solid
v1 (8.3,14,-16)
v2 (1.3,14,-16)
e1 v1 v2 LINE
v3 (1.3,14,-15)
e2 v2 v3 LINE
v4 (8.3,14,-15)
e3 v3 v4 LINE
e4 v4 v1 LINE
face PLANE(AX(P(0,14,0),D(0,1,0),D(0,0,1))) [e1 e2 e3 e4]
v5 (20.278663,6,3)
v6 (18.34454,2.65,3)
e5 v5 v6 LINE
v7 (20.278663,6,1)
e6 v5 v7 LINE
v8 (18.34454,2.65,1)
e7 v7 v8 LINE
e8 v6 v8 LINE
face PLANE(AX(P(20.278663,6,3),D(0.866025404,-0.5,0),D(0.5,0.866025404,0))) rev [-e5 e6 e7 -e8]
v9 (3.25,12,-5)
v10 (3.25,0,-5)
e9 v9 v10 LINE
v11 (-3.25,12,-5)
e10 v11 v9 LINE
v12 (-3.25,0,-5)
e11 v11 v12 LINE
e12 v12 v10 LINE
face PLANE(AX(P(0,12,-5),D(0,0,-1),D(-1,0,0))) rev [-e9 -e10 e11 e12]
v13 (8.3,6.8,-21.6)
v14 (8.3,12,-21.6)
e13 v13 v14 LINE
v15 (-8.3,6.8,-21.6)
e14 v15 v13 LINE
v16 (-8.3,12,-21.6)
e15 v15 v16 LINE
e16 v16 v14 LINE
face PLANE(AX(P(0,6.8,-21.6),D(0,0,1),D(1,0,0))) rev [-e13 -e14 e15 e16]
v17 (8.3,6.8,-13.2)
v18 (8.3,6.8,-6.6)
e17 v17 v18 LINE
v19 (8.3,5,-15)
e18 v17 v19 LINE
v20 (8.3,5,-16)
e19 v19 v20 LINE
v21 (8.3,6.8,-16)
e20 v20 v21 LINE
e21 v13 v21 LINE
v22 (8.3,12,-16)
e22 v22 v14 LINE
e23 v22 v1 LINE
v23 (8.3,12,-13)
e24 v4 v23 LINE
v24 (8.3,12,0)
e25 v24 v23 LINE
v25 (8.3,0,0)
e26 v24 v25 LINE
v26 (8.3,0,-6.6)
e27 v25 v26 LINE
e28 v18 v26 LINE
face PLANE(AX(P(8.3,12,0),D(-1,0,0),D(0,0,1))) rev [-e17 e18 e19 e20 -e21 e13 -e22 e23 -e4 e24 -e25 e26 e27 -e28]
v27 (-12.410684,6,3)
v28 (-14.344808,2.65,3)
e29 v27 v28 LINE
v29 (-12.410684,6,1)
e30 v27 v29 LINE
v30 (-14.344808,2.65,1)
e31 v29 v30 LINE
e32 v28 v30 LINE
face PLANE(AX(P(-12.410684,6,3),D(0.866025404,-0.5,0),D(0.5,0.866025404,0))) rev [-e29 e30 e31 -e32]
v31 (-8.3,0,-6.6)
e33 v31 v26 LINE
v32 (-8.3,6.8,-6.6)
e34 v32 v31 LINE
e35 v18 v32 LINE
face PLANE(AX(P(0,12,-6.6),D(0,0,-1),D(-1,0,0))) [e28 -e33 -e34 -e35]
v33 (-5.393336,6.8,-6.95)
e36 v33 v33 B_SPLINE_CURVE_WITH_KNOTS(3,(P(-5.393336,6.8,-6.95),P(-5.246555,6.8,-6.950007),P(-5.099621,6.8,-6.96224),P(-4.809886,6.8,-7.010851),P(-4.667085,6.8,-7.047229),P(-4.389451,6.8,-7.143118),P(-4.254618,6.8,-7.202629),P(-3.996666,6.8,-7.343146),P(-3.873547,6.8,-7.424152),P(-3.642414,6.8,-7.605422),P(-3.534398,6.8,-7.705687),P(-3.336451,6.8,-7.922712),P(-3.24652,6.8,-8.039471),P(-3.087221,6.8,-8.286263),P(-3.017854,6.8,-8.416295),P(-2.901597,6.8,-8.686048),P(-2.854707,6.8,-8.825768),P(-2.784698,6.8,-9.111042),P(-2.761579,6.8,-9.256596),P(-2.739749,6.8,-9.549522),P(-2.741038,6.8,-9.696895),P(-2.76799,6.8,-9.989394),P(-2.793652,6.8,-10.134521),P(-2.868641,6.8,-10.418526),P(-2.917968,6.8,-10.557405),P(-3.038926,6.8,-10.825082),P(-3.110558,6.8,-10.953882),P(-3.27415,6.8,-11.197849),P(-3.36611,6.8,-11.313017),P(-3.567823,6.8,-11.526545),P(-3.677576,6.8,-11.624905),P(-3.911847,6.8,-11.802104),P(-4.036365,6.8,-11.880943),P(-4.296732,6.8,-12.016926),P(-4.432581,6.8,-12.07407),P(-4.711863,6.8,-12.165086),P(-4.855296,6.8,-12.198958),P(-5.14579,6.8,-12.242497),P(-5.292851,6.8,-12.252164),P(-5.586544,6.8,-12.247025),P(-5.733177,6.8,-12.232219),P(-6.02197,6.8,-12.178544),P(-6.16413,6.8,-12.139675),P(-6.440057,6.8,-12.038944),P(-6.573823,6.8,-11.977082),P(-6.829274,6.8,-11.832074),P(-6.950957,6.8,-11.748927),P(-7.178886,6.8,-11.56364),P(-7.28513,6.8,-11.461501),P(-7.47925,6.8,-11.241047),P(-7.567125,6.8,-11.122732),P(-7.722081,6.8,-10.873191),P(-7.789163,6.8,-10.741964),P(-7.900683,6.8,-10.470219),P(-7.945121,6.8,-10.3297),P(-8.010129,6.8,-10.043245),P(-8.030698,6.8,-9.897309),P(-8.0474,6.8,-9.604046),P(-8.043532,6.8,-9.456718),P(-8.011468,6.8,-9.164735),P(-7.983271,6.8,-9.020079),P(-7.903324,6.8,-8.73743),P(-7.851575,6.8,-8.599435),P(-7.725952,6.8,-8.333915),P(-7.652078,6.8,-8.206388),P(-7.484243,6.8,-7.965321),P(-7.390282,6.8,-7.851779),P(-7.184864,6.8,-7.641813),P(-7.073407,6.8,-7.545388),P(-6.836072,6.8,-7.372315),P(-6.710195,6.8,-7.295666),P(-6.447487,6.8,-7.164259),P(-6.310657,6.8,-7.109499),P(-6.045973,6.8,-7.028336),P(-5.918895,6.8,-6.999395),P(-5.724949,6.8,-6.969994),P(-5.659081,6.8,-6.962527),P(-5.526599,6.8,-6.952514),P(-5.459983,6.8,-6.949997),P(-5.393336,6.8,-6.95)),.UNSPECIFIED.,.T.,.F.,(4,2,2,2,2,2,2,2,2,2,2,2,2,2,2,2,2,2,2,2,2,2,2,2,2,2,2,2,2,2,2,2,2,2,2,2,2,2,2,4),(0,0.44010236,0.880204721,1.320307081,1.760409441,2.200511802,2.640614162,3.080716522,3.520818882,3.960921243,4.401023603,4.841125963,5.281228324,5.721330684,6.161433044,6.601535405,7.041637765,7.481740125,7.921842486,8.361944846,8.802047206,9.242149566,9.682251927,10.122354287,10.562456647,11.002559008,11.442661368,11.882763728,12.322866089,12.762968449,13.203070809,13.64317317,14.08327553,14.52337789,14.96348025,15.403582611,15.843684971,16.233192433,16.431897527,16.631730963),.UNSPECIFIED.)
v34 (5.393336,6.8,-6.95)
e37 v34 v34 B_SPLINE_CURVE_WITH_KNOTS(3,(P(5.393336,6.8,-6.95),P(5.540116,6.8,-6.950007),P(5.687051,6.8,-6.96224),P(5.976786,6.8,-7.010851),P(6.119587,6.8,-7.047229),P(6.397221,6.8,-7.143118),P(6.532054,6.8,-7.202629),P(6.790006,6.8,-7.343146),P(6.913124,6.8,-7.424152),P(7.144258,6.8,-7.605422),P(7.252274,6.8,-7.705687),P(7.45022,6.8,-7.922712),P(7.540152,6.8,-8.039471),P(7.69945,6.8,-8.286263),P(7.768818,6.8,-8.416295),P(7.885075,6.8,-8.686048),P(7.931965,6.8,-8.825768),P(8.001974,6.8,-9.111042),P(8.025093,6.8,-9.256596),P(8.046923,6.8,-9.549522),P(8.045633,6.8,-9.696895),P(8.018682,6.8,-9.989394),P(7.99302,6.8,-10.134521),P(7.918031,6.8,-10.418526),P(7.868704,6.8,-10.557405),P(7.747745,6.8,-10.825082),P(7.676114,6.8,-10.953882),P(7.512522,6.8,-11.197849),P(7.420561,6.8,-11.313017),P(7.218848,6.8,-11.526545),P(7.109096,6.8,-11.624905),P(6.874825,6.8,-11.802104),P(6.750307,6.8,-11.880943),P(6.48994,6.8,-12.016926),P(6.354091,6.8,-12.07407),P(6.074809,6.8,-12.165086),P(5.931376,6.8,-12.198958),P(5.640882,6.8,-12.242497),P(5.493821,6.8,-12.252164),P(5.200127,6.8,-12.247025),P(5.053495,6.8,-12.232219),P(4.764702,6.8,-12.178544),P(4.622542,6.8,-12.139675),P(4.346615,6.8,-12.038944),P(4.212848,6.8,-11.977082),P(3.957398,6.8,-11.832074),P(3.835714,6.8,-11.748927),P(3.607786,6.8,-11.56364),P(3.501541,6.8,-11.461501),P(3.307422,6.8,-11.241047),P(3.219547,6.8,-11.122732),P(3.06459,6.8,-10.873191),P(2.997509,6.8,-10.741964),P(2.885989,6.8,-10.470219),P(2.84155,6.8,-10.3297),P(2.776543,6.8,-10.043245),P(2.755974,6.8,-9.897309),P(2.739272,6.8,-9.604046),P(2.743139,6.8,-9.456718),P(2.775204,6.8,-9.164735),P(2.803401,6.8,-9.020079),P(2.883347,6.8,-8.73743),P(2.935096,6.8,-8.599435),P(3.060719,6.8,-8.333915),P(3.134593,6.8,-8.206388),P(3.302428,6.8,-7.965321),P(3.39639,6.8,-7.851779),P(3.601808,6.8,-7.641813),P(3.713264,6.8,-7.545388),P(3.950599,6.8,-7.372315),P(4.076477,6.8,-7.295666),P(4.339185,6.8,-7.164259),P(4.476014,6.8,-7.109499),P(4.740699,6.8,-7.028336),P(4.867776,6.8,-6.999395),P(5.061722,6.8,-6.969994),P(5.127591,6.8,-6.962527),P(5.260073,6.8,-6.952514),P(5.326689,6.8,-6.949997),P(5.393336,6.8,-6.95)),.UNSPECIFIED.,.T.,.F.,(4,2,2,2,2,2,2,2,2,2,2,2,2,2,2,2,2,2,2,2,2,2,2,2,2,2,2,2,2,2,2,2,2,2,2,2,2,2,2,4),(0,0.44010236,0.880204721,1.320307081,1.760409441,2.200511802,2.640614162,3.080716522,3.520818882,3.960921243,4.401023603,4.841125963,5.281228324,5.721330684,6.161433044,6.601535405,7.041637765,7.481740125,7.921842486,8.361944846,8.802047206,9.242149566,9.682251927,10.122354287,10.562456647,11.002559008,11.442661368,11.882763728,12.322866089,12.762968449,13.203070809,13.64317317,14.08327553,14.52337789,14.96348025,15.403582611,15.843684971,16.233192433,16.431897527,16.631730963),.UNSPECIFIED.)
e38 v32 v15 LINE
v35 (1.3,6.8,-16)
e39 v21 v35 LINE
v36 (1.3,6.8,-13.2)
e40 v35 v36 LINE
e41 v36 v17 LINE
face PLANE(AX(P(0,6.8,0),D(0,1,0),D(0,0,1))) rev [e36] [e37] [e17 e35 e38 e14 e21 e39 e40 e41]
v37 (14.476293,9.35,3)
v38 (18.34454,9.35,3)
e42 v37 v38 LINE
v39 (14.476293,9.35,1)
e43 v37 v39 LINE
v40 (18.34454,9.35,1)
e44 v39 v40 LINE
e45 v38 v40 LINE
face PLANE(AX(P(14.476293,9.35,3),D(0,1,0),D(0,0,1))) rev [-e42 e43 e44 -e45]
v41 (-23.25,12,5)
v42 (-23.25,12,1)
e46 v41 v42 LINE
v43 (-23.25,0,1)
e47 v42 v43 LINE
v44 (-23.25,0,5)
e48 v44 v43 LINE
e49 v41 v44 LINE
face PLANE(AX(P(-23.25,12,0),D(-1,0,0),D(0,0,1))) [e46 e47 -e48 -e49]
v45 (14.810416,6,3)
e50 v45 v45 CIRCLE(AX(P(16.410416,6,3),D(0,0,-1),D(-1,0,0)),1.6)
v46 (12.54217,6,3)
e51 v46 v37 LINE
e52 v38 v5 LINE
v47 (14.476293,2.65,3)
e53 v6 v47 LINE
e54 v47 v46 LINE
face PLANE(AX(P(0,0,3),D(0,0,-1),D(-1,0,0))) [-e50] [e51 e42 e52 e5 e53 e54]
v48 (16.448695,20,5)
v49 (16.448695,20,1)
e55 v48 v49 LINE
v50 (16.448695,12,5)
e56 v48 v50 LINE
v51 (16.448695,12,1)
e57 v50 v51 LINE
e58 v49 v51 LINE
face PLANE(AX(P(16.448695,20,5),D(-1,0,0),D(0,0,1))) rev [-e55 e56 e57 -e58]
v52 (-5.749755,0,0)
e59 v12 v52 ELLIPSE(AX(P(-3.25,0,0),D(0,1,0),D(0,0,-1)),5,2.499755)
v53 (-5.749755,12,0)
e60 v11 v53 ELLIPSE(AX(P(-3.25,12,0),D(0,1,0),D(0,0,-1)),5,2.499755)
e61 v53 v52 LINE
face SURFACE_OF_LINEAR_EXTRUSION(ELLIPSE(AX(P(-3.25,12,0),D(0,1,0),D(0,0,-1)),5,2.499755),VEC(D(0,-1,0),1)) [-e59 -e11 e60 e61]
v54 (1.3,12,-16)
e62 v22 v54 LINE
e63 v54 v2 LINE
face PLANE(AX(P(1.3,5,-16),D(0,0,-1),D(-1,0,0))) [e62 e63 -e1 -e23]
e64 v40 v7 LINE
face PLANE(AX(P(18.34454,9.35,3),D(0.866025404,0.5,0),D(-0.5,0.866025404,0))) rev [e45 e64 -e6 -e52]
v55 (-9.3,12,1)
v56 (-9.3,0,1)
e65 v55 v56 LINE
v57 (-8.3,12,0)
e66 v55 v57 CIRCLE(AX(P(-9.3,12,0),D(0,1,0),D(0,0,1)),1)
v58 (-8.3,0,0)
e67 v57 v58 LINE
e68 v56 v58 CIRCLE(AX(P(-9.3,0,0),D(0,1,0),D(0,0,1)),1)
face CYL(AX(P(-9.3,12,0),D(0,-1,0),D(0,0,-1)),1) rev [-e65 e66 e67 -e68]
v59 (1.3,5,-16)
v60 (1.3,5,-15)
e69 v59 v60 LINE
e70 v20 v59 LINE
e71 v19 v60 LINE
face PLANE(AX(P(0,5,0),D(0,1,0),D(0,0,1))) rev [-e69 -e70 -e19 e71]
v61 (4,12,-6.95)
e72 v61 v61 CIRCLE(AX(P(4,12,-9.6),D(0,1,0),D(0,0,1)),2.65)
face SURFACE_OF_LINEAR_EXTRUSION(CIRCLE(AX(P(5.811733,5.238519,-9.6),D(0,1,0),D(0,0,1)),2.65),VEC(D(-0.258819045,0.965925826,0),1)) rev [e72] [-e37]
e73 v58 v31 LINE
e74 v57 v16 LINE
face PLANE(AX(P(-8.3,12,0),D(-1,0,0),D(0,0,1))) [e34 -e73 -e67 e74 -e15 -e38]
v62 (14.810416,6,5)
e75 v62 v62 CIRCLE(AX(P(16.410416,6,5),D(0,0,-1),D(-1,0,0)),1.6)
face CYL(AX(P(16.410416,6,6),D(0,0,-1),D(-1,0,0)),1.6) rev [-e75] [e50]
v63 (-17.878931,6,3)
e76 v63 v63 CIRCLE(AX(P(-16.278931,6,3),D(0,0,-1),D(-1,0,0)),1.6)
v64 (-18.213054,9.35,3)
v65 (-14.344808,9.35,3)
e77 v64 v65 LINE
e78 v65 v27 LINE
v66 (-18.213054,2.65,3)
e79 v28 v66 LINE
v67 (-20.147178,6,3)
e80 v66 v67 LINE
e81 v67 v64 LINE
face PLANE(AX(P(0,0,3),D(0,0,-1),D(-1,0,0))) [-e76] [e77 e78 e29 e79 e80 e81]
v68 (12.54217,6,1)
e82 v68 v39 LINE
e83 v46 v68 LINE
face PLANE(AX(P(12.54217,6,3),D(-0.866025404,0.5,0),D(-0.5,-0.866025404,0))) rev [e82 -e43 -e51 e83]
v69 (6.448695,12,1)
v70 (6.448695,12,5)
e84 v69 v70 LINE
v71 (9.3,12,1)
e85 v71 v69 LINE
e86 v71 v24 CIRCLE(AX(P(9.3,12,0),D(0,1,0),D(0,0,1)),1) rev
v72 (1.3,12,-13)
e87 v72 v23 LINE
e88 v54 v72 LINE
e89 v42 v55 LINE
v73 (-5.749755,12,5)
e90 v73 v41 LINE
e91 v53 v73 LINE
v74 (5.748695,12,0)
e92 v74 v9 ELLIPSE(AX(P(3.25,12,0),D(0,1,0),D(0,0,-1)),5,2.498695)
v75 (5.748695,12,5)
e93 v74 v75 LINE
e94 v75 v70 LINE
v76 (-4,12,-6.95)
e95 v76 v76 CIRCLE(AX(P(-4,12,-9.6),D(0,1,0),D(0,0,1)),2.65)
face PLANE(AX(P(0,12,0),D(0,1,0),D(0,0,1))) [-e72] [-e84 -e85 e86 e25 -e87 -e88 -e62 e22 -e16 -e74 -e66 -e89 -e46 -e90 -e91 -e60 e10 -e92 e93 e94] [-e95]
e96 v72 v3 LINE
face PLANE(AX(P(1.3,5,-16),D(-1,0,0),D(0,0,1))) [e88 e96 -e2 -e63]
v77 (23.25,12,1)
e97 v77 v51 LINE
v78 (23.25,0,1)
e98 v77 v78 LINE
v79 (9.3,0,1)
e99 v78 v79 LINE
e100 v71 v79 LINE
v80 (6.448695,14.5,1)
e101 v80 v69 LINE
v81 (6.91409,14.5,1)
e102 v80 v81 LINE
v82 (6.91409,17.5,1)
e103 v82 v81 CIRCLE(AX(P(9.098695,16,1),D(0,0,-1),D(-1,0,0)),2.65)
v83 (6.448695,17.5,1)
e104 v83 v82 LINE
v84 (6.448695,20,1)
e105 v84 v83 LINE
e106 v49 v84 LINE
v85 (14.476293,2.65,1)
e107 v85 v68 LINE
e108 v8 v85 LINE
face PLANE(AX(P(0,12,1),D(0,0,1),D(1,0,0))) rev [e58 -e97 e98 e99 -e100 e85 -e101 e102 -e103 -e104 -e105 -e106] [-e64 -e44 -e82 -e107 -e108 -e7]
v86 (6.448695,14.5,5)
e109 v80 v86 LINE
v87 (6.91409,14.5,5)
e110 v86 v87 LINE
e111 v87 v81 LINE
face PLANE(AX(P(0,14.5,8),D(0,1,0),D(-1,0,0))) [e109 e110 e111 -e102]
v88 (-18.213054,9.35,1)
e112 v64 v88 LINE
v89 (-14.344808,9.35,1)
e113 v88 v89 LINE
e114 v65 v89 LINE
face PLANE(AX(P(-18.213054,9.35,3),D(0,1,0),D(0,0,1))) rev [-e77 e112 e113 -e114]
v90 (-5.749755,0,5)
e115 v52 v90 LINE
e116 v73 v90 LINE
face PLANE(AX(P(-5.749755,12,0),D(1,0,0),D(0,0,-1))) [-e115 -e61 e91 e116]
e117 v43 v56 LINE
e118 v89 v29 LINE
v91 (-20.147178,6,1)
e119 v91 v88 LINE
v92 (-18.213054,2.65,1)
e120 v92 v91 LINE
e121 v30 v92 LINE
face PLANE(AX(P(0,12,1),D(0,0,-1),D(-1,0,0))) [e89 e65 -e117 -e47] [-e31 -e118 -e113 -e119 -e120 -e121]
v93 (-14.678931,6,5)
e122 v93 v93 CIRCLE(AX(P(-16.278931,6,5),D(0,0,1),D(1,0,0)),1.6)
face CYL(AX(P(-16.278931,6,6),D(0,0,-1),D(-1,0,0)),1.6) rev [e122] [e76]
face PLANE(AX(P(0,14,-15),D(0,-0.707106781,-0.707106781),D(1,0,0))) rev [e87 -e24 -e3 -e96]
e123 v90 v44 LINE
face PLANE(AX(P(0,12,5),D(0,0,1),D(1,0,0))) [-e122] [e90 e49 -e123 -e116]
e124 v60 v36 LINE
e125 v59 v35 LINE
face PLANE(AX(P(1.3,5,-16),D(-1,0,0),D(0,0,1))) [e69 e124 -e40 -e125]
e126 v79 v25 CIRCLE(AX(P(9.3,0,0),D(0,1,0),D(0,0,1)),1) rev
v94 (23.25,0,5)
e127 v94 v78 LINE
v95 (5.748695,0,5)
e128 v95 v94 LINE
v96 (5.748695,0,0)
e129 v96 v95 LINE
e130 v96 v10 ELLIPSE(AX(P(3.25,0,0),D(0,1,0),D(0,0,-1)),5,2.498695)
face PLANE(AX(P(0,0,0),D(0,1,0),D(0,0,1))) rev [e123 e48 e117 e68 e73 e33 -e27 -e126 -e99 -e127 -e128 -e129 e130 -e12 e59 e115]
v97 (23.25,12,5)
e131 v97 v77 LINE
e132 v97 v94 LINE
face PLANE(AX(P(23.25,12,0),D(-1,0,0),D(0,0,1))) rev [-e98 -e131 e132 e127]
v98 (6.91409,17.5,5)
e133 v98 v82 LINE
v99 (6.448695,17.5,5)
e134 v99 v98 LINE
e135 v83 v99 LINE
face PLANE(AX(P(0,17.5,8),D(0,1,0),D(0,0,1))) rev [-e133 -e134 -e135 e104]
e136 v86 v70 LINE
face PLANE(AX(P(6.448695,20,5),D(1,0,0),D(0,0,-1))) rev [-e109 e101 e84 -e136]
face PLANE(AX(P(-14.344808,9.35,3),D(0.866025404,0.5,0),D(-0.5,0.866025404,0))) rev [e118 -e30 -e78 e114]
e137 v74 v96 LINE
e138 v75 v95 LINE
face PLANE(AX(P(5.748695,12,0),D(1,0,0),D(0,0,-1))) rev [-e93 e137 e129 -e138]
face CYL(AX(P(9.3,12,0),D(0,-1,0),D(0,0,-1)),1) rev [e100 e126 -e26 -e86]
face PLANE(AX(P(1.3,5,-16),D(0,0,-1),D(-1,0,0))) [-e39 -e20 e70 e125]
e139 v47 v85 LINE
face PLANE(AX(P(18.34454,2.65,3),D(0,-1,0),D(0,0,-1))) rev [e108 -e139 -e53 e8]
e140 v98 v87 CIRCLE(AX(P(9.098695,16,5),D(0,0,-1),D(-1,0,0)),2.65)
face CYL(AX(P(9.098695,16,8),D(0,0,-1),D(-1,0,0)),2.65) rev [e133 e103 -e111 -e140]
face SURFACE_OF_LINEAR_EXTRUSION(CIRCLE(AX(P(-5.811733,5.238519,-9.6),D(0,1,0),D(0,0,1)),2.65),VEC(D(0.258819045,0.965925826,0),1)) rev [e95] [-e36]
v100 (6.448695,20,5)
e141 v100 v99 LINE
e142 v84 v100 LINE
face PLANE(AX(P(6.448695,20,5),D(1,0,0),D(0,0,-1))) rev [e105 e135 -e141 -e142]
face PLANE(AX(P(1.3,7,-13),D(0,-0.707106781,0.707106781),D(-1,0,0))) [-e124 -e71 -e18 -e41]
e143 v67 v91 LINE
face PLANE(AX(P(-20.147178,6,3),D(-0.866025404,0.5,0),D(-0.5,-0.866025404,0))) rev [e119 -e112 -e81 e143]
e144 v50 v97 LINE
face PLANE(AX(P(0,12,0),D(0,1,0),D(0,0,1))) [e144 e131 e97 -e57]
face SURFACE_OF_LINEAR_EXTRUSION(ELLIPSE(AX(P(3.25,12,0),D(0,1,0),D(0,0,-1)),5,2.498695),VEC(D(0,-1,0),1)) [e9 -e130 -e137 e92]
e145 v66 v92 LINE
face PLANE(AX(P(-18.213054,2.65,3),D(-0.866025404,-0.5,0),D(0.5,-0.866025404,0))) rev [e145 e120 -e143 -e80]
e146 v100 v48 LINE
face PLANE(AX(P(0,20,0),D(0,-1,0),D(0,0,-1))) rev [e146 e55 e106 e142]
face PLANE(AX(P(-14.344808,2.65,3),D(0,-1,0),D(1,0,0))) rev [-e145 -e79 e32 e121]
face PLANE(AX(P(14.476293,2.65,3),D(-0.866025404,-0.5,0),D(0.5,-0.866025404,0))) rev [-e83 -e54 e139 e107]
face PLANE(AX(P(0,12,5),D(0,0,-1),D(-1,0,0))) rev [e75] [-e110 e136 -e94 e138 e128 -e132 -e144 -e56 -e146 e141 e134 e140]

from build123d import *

# Parameters (mm, degrees)
BOSS_EXTRUDE1_DEPTH      = 12
CUT_EXTRUDE1_DEPTH       = 2
SKETCH3_W                = 16.6
SKETCH3_H                = 15
BOSS_EXTRUDE2_DEPTH      = 5.2
SKETCH5_R                = 1.6
CUT_EXTRUDE2_DEPTH       = 5
SKETCH6_W                = 10
SKETCH6_H                = 4
BOSS_EXTRUDE4_DEPTH      = 8
CUT_EXTRUDE4_DEPTH       = 7
SKETCH8_R                = 2.65
CUT_EXTRUDE5_DEPTH       = 7
SKETCH10_R               = 2.65
CUT_EXTRUDE6_DEPTH       = 7
BOSS_EXTRUDE6_DEPTH      = 2
BOSS_EXTRUDE6_DEPTH_BACK = 7
SKETCH11_W               = 7
SKETCH11_H               = 3
CHAMFER2_SIZE            = 2


with BuildPart() as part:
    # Sketch1 → Boss-Extrude1 (new body)
    with BuildSketch(Plane(origin=(0, 0, 0), x_dir=(1, 0, 0), z_dir=(0, 1, 0))):
        with BuildLine():
            Line((-23.25, -5), (-5.749755012, -5))
            Line((-5.749755012, -5), (-5.749755012, 0))
            add(Edge.make_bspline(
                [(-3.25, 5), (-5.749755012, 5), (-5.749755012, 0)],
                knots=[0, 0, 0, 1.570796327, 1.570796327, 1.570796327], degree=2, weights=[1, 0.707106781, 1]))
            Line((-3.25, 5), (3.25, 5))
            add(Edge.make_bspline(
                [(5.748694825, 0), (5.748694825, 5), (3.25, 5)],
                knots=[4.71238898, 4.71238898, 4.71238898, 6.283185307, 6.283185307, 6.283185307], degree=2, weights=[1, 0.707106781, 1]))
            Line((5.748694825, 0), (5.748694825, -5))
            Line((5.748694825, -5), (23.25, -5))
            Line((23.25, -5), (23.25, -3))
            Line((23.25, -3), (23.25, -1))
            Line((23.25, -1), (9.3, -1))
            ThreePointArc((9.3, -1), (8.592893219, -0.707106781), (8.3, 0))
            Line((8.3, 0), (8.3, 6.6))
            Line((8.3, 6.6), (-8.3, 6.6))
            Line((-8.3, 6.6), (-8.3, 0))
            ThreePointArc((-8.3, 0), (-8.592893219, -0.707106781), (-9.3, -1))
            Line((-9.3, -1), (-23.25, -1))
            Line((-23.25, -1), (-23.25, -5))
        make_face()
    extrude(amount=BOSS_EXTRUDE1_DEPTH)

    # Sketch2 → Cut-Extrude1 (cut)
    with BuildSketch(Plane(origin=(0, 0, 1), x_dir=(-1, 0, 0), z_dir=(0, 0, -1))):
        Polygon((20.147177825, 6), (18.213054423, 9.35), (14.344807619, 9.35), (12.410684218, 6), (14.344807619, 2.65), (18.213054423, 2.65), align=None)
        Polygon((-12.542169585, 6), (-14.476292987, 9.35), (-18.34453979, 9.35), (-20.278663192, 6), (-18.34453979, 2.65), (-14.476292987, 2.65), align=None)
    extrude(amount=-CUT_EXTRUDE1_DEPTH, mode=Mode.SUBTRACT)

    # Sketch3 → Boss-Extrude2 (add)
    with BuildSketch(Plane(origin=(0, 12, 0), x_dir=(1, 0, 0), z_dir=(0, 1, 0))):
        with Locations((0, 14.1)):
            Rectangle(SKETCH3_W, SKETCH3_H)
    extrude(amount=-BOSS_EXTRUDE2_DEPTH)

    # Sketch5 → Cut-Extrude2 (cut)
    with BuildSketch(Plane(origin=(0, 0, 1), x_dir=(-1, 0, 0), z_dir=(0, 0, -1))):
        with Locations((-16.410416388, 6)):
            Circle(SKETCH5_R)
        with Locations((16.278931021, 6)):
            Circle(SKETCH5_R)
    extrude(amount=-CUT_EXTRUDE2_DEPTH, mode=Mode.SUBTRACT)

    # Sketch6 → Boss-Extrude4 (add)
    with BuildSketch(Plane(origin=(0, 12, 0), x_dir=(1, 0, 0), z_dir=(0, 1, 0))):
        with Locations((11.448694825, -3)):
            Rectangle(SKETCH6_W, SKETCH6_H)
    extrude(amount=BOSS_EXTRUDE4_DEPTH)

    # Sketch7 → Cut-Extrude4 (cut)
    with BuildSketch(Plane(origin=(0, 0, 1), x_dir=(-1, 0, 0), z_dir=(0, 0, -1))):
        with BuildLine():
            ThreePointArc((-6.448694825, 16), (-6.567716372, 16.785269427), (-6.914089597, 17.5))
            Line((-6.914089597, 17.5), (-7.999397269, 17.5))
            Line((-7.999397269, 17.5), (-7.999397269, 14.5))
            Line((-7.999397269, 14.5), (-6.914089597, 14.5))
            ThreePointArc((-6.914089597, 14.5), (-6.567716372, 15.214730573), (-6.448694825, 16))
        make_face()
        with BuildLine():
            Line((-7.999397269, 17.5), (-6.914089597, 17.5))
            ThreePointArc((-6.914089597, 17.5), (-11.748694825, 16), (-6.914089597, 14.5))
            Line((-6.914089597, 14.5), (-7.999397269, 14.5))
            Line((-7.999397269, 14.5), (-7.999397269, 17.5))
        make_face()
        with BuildLine():
            Line((-6.448694825, 14.5), (-6.448694825, 16))
            ThreePointArc((-6.448694825, 16), (-6.567716372, 15.214730573), (-6.914089597, 14.5))
            Line((-6.914089597, 14.5), (-6.448694825, 14.5))
        make_face()
        with BuildLine():
            Line((-6.448694825, 16), (-6.448694825, 17.5))
            Line((-6.448694825, 17.5), (-6.914089597, 17.5))
            ThreePointArc((-6.914089597, 17.5), (-6.567716372, 16.785269427), (-6.448694825, 16))
        make_face()
    extrude(amount=-CUT_EXTRUDE4_DEPTH, mode=Mode.SUBTRACT)

    # Sketch8 → Cut-Extrude5 (cut, along a direction that is not the sketch's normal)
    with BuildSketch(Plane(origin=(0, 12, 0), x_dir=(1, 0, 0), z_dir=(0, 1, 0))):
        with Locations((-4, 9.6)):
            Circle(SKETCH8_R)
    extrude(amount=-CUT_EXTRUDE5_DEPTH, dir=(0.2588190451025147, 0.96592582628907, -1.457918124587514e-13), mode=Mode.SUBTRACT)

    # Sketch10 → Cut-Extrude6 (cut, along a direction that is not the sketch's normal)
    with BuildSketch(Plane(origin=(0, 12, 0), x_dir=(1, 0, 0), z_dir=(0, 1, 0))):
        with Locations((4, 9.6)):
            Circle(SKETCH10_R)
    extrude(amount=-CUT_EXTRUDE6_DEPTH, dir=(-0.25881904510251447, 0.96592582628907, 0), mode=Mode.SUBTRACT)

    # Sketch11 → Boss-Extrude6 (add, two sides: drawn at the far end of the back side and taken through both)
    with BuildSketch(Plane(origin=(0, 12, 0), x_dir=(1, 0, 0), z_dir=(0, 1, 0)).offset(-BOSS_EXTRUDE6_DEPTH_BACK)):
        with Locations((4.8, 14.5)):
            Rectangle(SKETCH11_W, SKETCH11_H)
    extrude(amount=BOSS_EXTRUDE6_DEPTH + BOSS_EXTRUDE6_DEPTH_BACK)

    # Chamfer2
    # the kernel refuses this chamfer: 2 mm, written as the material it takes off along each edge
    with BuildSketch(Plane(origin=(13.443365976, 5, -13), x_dir=(0, 0.9996219169112968, 0.027495876610586487), z_dir=(-1, 0, 0))) as chamfer2_piece_1_section:
        Polygon((CHAMFER2_SIZE * 0.999621916911, CHAMFER2_SIZE * 0.0274958766106), (-CHAMFER2_SIZE * 0.0274958766106, CHAMFER2_SIZE * 0.999621916911), (0, 0), align=None)
    chamfer2_piece_1 = extrude(amount=17.286731952, mode=Mode.PRIVATE)
    chamfer2_piece_1 = split(chamfer2_piece_1, bisect_by=Plane(origin=(4.8, 6.8, -13.671801494), z_dir=(0, -1, 0)), keep=Keep.TOP, mode=Mode.PRIVATE)
    add(chamfer2_piece_1, mode=Mode.SUBTRACT)
    with BuildSketch(Plane(origin=(13.443365976, 14, -13), x_dir=(0, -0.9996219169112968, 0.027495876610586487), z_dir=(-1, 0, 0))) as chamfer2_piece_2_section:
        Polygon((CHAMFER2_SIZE * 0.999621916911, -CHAMFER2_SIZE * 0.0274958766106), (-CHAMFER2_SIZE * 0.0274958766106, -CHAMFER2_SIZE * 0.999621916911), (0, 0), align=None)
    chamfer2_piece_2 = extrude(amount=17.286731952, mode=Mode.PRIVATE)
    chamfer2_piece_2 = split(chamfer2_piece_2, bisect_by=Plane(origin=(4.8, 12, -13.660808309), z_dir=(0, 1, 0)), keep=Keep.TOP, mode=Mode.PRIVATE)
    add(chamfer2_piece_2, mode=Mode.SUBTRACT)


solid = part.part
